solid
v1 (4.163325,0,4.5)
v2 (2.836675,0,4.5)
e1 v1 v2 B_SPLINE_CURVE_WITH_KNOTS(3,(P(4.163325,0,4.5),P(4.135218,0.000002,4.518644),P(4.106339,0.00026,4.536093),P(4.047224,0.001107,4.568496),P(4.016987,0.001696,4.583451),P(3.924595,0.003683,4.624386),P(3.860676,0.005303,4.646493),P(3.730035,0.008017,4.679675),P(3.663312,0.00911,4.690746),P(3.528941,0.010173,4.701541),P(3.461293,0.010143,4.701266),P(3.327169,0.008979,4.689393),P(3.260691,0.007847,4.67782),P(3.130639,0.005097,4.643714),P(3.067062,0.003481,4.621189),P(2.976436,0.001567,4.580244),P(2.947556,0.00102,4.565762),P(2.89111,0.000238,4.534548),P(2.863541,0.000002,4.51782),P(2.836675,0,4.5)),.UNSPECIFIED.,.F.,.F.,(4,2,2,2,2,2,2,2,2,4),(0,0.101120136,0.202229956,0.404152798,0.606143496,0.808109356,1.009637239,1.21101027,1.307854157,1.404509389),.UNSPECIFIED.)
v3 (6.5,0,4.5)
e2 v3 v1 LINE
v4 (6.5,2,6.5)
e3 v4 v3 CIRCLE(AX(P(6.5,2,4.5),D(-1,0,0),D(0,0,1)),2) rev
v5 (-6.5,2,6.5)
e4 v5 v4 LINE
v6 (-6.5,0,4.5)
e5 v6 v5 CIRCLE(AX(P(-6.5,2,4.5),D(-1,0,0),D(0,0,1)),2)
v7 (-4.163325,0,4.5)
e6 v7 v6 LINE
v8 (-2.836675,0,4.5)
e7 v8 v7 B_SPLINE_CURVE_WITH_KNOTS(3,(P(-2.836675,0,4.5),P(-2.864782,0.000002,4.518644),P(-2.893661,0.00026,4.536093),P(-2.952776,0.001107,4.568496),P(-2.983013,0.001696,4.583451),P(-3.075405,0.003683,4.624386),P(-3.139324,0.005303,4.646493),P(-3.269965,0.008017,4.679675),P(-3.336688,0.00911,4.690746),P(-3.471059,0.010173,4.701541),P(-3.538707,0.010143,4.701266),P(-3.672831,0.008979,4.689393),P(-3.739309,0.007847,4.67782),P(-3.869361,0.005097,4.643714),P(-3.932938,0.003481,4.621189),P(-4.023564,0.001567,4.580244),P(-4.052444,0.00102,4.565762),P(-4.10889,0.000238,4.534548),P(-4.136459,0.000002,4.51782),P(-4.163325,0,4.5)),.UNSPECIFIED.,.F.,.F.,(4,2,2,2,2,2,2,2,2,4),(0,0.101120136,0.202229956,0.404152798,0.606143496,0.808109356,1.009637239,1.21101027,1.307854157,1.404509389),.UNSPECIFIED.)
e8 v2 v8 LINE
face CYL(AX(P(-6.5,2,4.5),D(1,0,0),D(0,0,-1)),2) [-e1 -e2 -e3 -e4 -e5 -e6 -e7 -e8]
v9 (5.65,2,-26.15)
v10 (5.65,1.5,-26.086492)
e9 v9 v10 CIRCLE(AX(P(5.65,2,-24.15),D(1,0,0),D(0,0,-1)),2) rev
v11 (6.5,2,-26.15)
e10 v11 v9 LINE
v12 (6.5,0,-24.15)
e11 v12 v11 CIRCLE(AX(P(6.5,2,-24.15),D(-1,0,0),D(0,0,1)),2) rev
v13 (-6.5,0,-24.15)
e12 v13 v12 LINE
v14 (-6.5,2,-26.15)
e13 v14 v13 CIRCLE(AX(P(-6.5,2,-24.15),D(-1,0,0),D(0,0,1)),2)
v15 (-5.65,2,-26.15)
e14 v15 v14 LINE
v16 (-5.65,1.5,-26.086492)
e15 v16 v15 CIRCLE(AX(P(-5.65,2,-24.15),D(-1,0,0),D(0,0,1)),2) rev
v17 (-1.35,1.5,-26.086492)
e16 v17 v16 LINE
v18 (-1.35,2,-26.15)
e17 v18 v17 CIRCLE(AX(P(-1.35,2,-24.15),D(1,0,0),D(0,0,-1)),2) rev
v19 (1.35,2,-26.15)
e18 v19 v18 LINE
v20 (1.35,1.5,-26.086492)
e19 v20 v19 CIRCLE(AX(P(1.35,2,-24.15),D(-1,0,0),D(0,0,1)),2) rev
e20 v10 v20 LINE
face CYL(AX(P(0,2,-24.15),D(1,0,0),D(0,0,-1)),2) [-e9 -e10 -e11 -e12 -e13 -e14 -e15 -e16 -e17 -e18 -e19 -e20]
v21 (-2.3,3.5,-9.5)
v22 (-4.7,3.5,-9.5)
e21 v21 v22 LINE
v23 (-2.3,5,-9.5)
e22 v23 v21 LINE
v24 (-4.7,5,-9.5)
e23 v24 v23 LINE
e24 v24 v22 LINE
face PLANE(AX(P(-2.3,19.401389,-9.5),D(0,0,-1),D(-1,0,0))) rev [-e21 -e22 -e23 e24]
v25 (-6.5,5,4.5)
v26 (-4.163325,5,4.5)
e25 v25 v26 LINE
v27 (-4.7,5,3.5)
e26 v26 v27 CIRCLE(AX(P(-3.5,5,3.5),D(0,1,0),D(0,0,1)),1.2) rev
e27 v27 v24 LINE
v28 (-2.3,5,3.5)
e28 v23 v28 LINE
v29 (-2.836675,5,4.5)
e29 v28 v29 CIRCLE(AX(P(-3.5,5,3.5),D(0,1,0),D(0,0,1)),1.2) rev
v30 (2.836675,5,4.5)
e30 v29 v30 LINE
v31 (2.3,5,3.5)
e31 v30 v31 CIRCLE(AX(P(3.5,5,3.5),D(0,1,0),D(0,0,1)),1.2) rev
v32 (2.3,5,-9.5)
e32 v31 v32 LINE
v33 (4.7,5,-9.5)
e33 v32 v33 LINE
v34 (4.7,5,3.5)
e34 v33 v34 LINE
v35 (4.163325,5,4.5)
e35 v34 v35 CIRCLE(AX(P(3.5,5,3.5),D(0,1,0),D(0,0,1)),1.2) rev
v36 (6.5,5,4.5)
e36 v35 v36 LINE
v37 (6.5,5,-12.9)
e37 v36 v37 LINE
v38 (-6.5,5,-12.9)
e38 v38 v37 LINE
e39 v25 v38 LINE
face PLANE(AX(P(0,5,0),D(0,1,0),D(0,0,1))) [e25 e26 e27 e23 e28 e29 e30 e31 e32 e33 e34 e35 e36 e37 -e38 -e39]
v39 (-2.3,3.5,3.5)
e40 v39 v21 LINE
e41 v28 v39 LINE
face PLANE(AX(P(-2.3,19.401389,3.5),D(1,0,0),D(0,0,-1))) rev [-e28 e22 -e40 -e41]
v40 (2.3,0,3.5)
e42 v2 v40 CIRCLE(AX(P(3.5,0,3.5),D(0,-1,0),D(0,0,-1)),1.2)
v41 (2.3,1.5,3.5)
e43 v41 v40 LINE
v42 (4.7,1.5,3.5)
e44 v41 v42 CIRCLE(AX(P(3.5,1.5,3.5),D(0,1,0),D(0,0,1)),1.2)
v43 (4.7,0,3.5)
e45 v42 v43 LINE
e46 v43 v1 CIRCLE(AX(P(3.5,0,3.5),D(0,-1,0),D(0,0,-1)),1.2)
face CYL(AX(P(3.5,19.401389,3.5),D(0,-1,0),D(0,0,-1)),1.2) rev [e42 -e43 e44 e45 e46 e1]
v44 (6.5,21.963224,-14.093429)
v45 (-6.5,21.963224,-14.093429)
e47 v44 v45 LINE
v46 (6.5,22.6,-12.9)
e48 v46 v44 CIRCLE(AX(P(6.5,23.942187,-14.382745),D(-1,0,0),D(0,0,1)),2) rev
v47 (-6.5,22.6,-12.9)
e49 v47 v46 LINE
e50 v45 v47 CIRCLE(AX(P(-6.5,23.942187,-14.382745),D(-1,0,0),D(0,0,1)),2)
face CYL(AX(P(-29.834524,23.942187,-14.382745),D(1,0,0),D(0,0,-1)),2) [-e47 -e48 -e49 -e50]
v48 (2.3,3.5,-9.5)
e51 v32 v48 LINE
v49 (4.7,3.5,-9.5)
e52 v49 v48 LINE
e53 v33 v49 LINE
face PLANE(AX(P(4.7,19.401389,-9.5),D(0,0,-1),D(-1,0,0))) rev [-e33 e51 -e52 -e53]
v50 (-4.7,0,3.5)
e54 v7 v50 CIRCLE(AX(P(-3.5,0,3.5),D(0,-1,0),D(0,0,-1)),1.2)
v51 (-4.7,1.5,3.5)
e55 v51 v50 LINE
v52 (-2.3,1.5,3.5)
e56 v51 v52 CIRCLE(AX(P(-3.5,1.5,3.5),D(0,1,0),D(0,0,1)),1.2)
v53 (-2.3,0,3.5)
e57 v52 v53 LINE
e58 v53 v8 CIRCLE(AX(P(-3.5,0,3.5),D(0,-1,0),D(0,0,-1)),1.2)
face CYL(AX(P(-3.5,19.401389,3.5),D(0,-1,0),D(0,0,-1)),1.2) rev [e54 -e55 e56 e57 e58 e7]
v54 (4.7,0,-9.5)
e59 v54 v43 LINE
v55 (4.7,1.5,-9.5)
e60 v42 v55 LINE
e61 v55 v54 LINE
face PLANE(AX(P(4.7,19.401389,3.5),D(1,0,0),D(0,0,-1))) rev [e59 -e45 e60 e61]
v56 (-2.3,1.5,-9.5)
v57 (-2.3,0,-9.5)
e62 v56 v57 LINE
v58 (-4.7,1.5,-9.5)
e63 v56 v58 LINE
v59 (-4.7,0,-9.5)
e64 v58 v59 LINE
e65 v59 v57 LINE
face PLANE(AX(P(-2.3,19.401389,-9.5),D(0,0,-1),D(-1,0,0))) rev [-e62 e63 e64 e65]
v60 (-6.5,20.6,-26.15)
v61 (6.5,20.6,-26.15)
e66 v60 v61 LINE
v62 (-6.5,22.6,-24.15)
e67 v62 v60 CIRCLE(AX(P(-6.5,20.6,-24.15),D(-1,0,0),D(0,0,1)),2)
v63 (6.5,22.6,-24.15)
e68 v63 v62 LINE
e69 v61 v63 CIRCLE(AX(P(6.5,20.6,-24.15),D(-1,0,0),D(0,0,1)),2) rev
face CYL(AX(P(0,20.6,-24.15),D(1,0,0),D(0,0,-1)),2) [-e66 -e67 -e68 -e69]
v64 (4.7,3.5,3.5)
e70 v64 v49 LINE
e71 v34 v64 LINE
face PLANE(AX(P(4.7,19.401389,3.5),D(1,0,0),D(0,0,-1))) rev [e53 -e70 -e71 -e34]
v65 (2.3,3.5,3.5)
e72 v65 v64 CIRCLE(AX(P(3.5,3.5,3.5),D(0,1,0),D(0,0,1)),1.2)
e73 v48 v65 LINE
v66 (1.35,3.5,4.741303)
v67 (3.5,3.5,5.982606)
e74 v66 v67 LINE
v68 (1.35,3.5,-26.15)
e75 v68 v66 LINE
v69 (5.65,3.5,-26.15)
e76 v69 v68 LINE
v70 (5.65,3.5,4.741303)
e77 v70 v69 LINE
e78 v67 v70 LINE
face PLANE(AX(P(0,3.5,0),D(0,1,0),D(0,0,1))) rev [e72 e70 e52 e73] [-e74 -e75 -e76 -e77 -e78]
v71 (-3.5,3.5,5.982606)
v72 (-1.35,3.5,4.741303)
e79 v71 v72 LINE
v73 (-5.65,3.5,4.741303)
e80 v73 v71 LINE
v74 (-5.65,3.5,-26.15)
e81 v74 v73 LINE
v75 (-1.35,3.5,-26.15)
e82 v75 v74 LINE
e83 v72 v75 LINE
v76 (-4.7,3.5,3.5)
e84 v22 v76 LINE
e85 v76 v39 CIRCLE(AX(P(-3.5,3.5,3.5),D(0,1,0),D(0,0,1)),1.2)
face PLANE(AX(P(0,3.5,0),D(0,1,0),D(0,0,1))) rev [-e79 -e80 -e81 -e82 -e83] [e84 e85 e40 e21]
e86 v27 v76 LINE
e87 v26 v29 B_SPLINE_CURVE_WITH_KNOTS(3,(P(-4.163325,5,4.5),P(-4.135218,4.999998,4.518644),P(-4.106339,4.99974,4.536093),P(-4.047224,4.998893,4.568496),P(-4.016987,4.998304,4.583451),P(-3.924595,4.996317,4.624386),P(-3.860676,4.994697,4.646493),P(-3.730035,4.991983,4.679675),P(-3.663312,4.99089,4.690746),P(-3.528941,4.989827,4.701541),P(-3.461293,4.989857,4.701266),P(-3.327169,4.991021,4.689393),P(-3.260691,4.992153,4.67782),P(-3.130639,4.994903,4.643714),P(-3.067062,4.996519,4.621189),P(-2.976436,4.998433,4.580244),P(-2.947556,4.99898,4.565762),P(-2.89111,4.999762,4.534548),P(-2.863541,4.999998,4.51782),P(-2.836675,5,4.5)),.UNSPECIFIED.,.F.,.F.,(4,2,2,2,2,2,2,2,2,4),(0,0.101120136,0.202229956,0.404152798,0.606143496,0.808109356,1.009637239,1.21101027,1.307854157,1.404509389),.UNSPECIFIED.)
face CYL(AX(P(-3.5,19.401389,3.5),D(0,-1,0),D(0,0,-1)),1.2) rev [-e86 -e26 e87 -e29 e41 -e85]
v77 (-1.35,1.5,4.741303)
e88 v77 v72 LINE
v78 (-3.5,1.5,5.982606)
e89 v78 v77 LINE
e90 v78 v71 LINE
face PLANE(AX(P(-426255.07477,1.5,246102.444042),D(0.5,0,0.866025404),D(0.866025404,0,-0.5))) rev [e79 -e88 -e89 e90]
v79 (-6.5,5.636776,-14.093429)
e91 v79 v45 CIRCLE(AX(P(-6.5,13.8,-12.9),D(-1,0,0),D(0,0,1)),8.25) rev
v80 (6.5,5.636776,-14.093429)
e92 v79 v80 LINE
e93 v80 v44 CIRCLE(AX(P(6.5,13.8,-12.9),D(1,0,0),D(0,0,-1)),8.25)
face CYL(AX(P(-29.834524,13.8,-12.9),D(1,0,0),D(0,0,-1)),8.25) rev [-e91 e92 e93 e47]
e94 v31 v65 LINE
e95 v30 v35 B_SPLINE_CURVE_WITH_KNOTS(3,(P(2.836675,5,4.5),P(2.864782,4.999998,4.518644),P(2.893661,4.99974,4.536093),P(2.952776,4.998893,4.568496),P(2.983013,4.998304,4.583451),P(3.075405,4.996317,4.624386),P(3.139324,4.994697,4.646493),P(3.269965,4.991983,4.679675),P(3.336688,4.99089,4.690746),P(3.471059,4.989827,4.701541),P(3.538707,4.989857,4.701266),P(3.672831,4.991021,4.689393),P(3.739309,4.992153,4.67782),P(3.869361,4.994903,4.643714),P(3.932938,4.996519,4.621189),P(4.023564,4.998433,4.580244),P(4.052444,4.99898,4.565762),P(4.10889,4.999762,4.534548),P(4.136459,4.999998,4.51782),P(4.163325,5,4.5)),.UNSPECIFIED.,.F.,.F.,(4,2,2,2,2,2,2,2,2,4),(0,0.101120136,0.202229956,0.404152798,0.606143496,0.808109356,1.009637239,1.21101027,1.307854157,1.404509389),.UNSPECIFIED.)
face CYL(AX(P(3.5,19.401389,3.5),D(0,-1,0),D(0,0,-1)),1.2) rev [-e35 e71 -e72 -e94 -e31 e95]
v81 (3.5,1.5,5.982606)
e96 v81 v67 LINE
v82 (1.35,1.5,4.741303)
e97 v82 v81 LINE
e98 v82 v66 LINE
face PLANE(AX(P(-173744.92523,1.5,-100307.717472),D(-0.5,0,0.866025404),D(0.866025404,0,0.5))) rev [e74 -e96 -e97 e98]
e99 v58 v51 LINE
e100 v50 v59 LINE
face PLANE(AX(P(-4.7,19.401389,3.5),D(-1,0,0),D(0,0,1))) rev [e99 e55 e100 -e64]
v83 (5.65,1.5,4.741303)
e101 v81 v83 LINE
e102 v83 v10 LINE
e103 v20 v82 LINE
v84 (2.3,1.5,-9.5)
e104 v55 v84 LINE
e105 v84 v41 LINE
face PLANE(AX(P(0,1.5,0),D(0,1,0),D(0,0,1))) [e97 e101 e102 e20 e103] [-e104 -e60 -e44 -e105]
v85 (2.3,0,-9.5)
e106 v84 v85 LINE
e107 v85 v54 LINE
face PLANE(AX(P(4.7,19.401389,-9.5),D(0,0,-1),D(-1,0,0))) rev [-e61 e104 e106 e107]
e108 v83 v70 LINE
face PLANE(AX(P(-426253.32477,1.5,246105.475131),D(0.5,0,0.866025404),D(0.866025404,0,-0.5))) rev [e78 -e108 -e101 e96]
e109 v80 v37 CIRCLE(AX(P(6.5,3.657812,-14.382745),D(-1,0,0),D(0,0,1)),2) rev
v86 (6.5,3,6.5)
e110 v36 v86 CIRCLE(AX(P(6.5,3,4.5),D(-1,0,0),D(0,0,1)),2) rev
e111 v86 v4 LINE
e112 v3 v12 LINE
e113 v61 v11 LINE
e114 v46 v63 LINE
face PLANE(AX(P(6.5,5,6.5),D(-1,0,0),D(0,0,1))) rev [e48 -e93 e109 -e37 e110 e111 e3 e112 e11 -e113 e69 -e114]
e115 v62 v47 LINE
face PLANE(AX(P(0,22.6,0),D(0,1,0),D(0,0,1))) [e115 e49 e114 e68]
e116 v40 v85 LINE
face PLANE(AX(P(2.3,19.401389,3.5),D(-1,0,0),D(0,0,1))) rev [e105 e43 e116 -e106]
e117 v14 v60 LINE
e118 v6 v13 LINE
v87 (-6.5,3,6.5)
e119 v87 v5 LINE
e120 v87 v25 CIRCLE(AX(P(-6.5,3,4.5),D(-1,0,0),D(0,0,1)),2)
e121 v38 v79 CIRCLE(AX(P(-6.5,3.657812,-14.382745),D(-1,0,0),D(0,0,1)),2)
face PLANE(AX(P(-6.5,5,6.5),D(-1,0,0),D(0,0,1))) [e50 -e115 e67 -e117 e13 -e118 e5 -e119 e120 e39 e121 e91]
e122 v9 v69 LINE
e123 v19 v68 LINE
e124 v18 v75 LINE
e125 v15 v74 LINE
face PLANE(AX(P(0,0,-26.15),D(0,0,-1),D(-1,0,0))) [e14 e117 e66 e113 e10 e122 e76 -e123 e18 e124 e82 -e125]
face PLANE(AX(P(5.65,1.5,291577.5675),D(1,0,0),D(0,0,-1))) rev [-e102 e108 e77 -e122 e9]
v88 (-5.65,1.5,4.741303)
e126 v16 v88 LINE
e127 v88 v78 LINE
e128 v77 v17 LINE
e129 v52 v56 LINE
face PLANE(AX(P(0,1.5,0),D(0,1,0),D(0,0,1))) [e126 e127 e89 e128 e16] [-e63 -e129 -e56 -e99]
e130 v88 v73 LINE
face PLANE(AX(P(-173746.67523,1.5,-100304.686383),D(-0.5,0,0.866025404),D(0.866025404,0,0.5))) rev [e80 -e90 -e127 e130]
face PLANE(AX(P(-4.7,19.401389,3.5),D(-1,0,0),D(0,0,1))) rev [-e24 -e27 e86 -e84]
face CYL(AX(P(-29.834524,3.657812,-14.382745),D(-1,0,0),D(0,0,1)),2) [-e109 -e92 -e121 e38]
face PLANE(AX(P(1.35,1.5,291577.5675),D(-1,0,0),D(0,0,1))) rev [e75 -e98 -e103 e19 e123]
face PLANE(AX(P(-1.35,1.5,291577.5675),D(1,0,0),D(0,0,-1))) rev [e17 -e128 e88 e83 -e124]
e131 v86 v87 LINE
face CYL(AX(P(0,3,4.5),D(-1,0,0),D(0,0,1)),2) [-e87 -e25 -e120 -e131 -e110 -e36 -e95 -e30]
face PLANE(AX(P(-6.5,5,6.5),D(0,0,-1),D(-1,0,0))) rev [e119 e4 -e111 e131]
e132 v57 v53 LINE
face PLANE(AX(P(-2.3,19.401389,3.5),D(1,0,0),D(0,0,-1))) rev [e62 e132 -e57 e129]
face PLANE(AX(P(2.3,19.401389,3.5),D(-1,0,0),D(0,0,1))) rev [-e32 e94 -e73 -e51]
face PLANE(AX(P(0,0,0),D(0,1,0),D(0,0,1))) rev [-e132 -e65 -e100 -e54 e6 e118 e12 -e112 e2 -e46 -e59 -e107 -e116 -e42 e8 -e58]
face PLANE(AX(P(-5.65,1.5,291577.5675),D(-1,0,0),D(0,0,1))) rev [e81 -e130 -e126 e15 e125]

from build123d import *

# Parameters (mm, degrees)
SKETCH1_W               = 13
SKETCH1_H               = 13
BOSS_EXTRUDE1_DEPTH     = 5
SKETCH2_W               = 13
SKETCH2_H               = 5
BOSS_EXTRUDE2_DEPTH     = 16.4
SKETCH3_W               = 13
SKETCH3_H               = 10
BOSS_EXTRUDE3_DEPTH     = 17.6
SKETCH4_R               = 8.25
CUT_EXTRUDE1_DEPTH      = 13
SKETCH5_W               = 13
SKETCH5_H               = 22.6
BOSS_EXTRUDE4_DEPTH     = 3.25
CUT_EXTRUDE2_DEPTH      = 1
CUT_EXTRUDE2_DEPTH_BACK = 1
CUT_EXTRUDE2_START      = -2.5
CUT_EXTRUDE3_REACH      = 37.169
FILLET2_R               = 2


with BuildPart() as part:
    # Sketch1 → Boss-Extrude1 (new body)
    with BuildSketch(Plane(origin=(0, 0, 0), x_dir=(1, 0, 0), z_dir=(0, 1, 0))):
        Rectangle(SKETCH1_W, SKETCH1_H)
    extrude(amount=BOSS_EXTRUDE1_DEPTH)

    # Sketch2 → Boss-Extrude2 (add)
    with BuildSketch(Plane(origin=(0, 0, -6.5), x_dir=(-1, 0, 0), z_dir=(0, 0, -1))):
        with Locations((0, 2.5)):
            Rectangle(SKETCH2_W, SKETCH2_H)
    extrude(amount=BOSS_EXTRUDE2_DEPTH)

    # Sketch3 → Boss-Extrude3 (add)
    with BuildSketch(Plane(origin=(0, 5, 0), x_dir=(1, 0, 0), z_dir=(0, 1, 0))):
        with Locations((0, 17.9)):
            Rectangle(SKETCH3_W, SKETCH3_H)
    extrude(amount=BOSS_EXTRUDE3_DEPTH)

    # Sketch4 → Cut-Extrude1 (cut)
    with BuildSketch(Plane(origin=(6.5, 0, 0), x_dir=(0, 0, -1), z_dir=(1, 0, 0))):
        with Locations((12.9, 13.8)):
            Circle(SKETCH4_R)
    extrude(amount=-CUT_EXTRUDE1_DEPTH, mode=Mode.SUBTRACT)

    # Sketch5 → Boss-Extrude4 (add)
    with BuildSketch(Plane(origin=(0, 0, -22.9), x_dir=(-1, 0, 0), z_dir=(0, 0, -1))):
        with Locations((0, 11.3)):
            Rectangle(SKETCH5_W, SKETCH5_H)
    extrude(amount=BOSS_EXTRUDE4_DEPTH)

    # Sketch6 → Cut-Extrude2 (cut, two sides: drawn at the far end of the back side and taken through both)
    with BuildSketch(Plane.XZ.offset(CUT_EXTRUDE2_START - CUT_EXTRUDE2_DEPTH_BACK)):
        Polygon((5.65, 2.258696921), (5.65, -26.15), (1.35, -26.15), (1.35, 2.258696921), (1.35, 4.741303079), (3.5, 5.982606158), (5.65, 4.741303079), align=None)
        Polygon((-1.35, 2.258696921), (-1.35, 4.741303079), (-3.5, 5.982606158), (-5.65, 4.741303079), (-5.65, 2.258696921), (-5.65, -26.15), (-1.35, -26.15), align=None)
    extrude(amount=CUT_EXTRUDE2_DEPTH + CUT_EXTRUDE2_DEPTH_BACK, mode=Mode.SUBTRACT)

    # Cut-Extrude3: up to this face of the body (flat: up to its plane)
    cut_extrude3_end = Plane(part.part.faces().sort_by_distance((0, 5, -3.2))[0])
    # Sketch7 → Cut-Extrude3 (cut, up to the picked face)
    with BuildSketch(Plane.XZ, mode=Mode.PRIVATE) as cut_extrude3_sk1:
        with BuildLine():
            Line((-2.3, 3.5), (-2.3, -9.5))
            Line((-2.3, -9.5), (-4.7, -9.5))
            Line((-4.7, -9.5), (-4.7, 3.5))
            ThreePointArc((-4.7, 3.5), (-3.5, 4.7), (-2.3, 3.5))
        make_face()
    cut_extrude3_tool1 = split(extrude(cut_extrude3_sk1.sketch, amount=-CUT_EXTRUDE3_REACH, mode=Mode.PRIVATE), bisect_by=cut_extrude3_end, keep=Keep.BOTH, mode=Mode.PRIVATE)
    # Sketch7 → Cut-Extrude3 (cut, up to the picked face)
    with BuildSketch(Plane.XZ, mode=Mode.PRIVATE) as cut_extrude3_sk2:
        with BuildLine():
            Line((2.3, 3.5), (2.3, -9.5))
            Line((2.3, -9.5), (4.7, -9.5))
            Line((4.7, -9.5), (4.7, 3.5))
            ThreePointArc((4.7, 3.5), (3.5, 4.7), (2.3, 3.5))
        make_face()
    cut_extrude3_tool2 = split(extrude(cut_extrude3_sk2.sketch, amount=-CUT_EXTRUDE3_REACH, mode=Mode.PRIVATE), bisect_by=cut_extrude3_end, keep=Keep.BOTH, mode=Mode.PRIVATE)
    add(cut_extrude3_tool1.solids().sort_by(Axis((-3.5, 0, -2.526189), (0, 1, 0)))[0], mode=Mode.SUBTRACT)
    add(cut_extrude3_tool2.solids().sort_by(Axis((3.5, 0, -2.526189), (0, 1, 0)))[0], mode=Mode.SUBTRACT)

    # Fillet2
    # the kernel refuses this fillet: 2 mm, written as the material it takes off along each edge
    with BuildSketch(Plane(origin=(-11.5, 0, 6.5), x_dir=(0, 1, 0), z_dir=(1, 0, 0)), Plane(origin=(-11.5, 0, -26.15), x_dir=(0, 0, 1), z_dir=(1, 0, 0))) as fillet2_piece_1:
        with BuildLine():
            CenterArc((FILLET2_R, -FILLET2_R), FILLET2_R, 90, 90)
            Line((0, -FILLET2_R), (0, 0))
            Line((0, 0), (FILLET2_R, 0))
        make_face()
    extrude(amount=23, mode=Mode.SUBTRACT)
    with BuildSketch(Plane(origin=(-11.5, 5, 6.5), x_dir=(0, -1, 0), z_dir=(1, 0, 0)), Plane(origin=(11.5, 22.6, -26.15), x_dir=(0, -1, 0), z_dir=(-1, 0, 0))) as fillet2_piece_2:
        with BuildLine():
            CenterArc((FILLET2_R, FILLET2_R), FILLET2_R, 180, 90)
            Line((0, FILLET2_R), (0, 0))
            Line((0, 0), (FILLET2_R, 0))
        make_face()
    extrude(amount=23, mode=Mode.SUBTRACT)
    with BuildSketch(Plane(origin=(-9.491448846, 5.55, -12.9), x_dir=(0, 0.0725199720178057, -0.9973669603804493), z_dir=(1, 0, 0))) as fillet2_piece_3:
        with BuildLine():
            CenterArc((1.341619482, -1.994733921), FILLET2_R, 94.15873901, 39.530984807)
            Line((-0.039885985, -0.548551828), (0, 0))
            ThreePointArc((0, 0), (0.598289769, -0.021722577), (1.196579538, 0))
        make_face()
    extrude(amount=18.982897691, mode=Mode.SUBTRACT)
    with BuildSketch(Plane(origin=(-9.491448846, 22.05, -12.9), x_dir=(0, 1, 0), z_dir=(1, 0, 0))) as fillet2_piece_4:
        with BuildLine():
            CenterArc((1.8921875, -1.482744993), FILLET2_R, 132.151537174, 39.530984807)
            ThreePointArc((-0.086775915, -1.193428897), (-0.021722577, -0.598289769), (0, 0))
            Line((0, 0), (0.55, 0))
        make_face()
    extrude(amount=18.982897691, mode=Mode.SUBTRACT)


solid = part.part
